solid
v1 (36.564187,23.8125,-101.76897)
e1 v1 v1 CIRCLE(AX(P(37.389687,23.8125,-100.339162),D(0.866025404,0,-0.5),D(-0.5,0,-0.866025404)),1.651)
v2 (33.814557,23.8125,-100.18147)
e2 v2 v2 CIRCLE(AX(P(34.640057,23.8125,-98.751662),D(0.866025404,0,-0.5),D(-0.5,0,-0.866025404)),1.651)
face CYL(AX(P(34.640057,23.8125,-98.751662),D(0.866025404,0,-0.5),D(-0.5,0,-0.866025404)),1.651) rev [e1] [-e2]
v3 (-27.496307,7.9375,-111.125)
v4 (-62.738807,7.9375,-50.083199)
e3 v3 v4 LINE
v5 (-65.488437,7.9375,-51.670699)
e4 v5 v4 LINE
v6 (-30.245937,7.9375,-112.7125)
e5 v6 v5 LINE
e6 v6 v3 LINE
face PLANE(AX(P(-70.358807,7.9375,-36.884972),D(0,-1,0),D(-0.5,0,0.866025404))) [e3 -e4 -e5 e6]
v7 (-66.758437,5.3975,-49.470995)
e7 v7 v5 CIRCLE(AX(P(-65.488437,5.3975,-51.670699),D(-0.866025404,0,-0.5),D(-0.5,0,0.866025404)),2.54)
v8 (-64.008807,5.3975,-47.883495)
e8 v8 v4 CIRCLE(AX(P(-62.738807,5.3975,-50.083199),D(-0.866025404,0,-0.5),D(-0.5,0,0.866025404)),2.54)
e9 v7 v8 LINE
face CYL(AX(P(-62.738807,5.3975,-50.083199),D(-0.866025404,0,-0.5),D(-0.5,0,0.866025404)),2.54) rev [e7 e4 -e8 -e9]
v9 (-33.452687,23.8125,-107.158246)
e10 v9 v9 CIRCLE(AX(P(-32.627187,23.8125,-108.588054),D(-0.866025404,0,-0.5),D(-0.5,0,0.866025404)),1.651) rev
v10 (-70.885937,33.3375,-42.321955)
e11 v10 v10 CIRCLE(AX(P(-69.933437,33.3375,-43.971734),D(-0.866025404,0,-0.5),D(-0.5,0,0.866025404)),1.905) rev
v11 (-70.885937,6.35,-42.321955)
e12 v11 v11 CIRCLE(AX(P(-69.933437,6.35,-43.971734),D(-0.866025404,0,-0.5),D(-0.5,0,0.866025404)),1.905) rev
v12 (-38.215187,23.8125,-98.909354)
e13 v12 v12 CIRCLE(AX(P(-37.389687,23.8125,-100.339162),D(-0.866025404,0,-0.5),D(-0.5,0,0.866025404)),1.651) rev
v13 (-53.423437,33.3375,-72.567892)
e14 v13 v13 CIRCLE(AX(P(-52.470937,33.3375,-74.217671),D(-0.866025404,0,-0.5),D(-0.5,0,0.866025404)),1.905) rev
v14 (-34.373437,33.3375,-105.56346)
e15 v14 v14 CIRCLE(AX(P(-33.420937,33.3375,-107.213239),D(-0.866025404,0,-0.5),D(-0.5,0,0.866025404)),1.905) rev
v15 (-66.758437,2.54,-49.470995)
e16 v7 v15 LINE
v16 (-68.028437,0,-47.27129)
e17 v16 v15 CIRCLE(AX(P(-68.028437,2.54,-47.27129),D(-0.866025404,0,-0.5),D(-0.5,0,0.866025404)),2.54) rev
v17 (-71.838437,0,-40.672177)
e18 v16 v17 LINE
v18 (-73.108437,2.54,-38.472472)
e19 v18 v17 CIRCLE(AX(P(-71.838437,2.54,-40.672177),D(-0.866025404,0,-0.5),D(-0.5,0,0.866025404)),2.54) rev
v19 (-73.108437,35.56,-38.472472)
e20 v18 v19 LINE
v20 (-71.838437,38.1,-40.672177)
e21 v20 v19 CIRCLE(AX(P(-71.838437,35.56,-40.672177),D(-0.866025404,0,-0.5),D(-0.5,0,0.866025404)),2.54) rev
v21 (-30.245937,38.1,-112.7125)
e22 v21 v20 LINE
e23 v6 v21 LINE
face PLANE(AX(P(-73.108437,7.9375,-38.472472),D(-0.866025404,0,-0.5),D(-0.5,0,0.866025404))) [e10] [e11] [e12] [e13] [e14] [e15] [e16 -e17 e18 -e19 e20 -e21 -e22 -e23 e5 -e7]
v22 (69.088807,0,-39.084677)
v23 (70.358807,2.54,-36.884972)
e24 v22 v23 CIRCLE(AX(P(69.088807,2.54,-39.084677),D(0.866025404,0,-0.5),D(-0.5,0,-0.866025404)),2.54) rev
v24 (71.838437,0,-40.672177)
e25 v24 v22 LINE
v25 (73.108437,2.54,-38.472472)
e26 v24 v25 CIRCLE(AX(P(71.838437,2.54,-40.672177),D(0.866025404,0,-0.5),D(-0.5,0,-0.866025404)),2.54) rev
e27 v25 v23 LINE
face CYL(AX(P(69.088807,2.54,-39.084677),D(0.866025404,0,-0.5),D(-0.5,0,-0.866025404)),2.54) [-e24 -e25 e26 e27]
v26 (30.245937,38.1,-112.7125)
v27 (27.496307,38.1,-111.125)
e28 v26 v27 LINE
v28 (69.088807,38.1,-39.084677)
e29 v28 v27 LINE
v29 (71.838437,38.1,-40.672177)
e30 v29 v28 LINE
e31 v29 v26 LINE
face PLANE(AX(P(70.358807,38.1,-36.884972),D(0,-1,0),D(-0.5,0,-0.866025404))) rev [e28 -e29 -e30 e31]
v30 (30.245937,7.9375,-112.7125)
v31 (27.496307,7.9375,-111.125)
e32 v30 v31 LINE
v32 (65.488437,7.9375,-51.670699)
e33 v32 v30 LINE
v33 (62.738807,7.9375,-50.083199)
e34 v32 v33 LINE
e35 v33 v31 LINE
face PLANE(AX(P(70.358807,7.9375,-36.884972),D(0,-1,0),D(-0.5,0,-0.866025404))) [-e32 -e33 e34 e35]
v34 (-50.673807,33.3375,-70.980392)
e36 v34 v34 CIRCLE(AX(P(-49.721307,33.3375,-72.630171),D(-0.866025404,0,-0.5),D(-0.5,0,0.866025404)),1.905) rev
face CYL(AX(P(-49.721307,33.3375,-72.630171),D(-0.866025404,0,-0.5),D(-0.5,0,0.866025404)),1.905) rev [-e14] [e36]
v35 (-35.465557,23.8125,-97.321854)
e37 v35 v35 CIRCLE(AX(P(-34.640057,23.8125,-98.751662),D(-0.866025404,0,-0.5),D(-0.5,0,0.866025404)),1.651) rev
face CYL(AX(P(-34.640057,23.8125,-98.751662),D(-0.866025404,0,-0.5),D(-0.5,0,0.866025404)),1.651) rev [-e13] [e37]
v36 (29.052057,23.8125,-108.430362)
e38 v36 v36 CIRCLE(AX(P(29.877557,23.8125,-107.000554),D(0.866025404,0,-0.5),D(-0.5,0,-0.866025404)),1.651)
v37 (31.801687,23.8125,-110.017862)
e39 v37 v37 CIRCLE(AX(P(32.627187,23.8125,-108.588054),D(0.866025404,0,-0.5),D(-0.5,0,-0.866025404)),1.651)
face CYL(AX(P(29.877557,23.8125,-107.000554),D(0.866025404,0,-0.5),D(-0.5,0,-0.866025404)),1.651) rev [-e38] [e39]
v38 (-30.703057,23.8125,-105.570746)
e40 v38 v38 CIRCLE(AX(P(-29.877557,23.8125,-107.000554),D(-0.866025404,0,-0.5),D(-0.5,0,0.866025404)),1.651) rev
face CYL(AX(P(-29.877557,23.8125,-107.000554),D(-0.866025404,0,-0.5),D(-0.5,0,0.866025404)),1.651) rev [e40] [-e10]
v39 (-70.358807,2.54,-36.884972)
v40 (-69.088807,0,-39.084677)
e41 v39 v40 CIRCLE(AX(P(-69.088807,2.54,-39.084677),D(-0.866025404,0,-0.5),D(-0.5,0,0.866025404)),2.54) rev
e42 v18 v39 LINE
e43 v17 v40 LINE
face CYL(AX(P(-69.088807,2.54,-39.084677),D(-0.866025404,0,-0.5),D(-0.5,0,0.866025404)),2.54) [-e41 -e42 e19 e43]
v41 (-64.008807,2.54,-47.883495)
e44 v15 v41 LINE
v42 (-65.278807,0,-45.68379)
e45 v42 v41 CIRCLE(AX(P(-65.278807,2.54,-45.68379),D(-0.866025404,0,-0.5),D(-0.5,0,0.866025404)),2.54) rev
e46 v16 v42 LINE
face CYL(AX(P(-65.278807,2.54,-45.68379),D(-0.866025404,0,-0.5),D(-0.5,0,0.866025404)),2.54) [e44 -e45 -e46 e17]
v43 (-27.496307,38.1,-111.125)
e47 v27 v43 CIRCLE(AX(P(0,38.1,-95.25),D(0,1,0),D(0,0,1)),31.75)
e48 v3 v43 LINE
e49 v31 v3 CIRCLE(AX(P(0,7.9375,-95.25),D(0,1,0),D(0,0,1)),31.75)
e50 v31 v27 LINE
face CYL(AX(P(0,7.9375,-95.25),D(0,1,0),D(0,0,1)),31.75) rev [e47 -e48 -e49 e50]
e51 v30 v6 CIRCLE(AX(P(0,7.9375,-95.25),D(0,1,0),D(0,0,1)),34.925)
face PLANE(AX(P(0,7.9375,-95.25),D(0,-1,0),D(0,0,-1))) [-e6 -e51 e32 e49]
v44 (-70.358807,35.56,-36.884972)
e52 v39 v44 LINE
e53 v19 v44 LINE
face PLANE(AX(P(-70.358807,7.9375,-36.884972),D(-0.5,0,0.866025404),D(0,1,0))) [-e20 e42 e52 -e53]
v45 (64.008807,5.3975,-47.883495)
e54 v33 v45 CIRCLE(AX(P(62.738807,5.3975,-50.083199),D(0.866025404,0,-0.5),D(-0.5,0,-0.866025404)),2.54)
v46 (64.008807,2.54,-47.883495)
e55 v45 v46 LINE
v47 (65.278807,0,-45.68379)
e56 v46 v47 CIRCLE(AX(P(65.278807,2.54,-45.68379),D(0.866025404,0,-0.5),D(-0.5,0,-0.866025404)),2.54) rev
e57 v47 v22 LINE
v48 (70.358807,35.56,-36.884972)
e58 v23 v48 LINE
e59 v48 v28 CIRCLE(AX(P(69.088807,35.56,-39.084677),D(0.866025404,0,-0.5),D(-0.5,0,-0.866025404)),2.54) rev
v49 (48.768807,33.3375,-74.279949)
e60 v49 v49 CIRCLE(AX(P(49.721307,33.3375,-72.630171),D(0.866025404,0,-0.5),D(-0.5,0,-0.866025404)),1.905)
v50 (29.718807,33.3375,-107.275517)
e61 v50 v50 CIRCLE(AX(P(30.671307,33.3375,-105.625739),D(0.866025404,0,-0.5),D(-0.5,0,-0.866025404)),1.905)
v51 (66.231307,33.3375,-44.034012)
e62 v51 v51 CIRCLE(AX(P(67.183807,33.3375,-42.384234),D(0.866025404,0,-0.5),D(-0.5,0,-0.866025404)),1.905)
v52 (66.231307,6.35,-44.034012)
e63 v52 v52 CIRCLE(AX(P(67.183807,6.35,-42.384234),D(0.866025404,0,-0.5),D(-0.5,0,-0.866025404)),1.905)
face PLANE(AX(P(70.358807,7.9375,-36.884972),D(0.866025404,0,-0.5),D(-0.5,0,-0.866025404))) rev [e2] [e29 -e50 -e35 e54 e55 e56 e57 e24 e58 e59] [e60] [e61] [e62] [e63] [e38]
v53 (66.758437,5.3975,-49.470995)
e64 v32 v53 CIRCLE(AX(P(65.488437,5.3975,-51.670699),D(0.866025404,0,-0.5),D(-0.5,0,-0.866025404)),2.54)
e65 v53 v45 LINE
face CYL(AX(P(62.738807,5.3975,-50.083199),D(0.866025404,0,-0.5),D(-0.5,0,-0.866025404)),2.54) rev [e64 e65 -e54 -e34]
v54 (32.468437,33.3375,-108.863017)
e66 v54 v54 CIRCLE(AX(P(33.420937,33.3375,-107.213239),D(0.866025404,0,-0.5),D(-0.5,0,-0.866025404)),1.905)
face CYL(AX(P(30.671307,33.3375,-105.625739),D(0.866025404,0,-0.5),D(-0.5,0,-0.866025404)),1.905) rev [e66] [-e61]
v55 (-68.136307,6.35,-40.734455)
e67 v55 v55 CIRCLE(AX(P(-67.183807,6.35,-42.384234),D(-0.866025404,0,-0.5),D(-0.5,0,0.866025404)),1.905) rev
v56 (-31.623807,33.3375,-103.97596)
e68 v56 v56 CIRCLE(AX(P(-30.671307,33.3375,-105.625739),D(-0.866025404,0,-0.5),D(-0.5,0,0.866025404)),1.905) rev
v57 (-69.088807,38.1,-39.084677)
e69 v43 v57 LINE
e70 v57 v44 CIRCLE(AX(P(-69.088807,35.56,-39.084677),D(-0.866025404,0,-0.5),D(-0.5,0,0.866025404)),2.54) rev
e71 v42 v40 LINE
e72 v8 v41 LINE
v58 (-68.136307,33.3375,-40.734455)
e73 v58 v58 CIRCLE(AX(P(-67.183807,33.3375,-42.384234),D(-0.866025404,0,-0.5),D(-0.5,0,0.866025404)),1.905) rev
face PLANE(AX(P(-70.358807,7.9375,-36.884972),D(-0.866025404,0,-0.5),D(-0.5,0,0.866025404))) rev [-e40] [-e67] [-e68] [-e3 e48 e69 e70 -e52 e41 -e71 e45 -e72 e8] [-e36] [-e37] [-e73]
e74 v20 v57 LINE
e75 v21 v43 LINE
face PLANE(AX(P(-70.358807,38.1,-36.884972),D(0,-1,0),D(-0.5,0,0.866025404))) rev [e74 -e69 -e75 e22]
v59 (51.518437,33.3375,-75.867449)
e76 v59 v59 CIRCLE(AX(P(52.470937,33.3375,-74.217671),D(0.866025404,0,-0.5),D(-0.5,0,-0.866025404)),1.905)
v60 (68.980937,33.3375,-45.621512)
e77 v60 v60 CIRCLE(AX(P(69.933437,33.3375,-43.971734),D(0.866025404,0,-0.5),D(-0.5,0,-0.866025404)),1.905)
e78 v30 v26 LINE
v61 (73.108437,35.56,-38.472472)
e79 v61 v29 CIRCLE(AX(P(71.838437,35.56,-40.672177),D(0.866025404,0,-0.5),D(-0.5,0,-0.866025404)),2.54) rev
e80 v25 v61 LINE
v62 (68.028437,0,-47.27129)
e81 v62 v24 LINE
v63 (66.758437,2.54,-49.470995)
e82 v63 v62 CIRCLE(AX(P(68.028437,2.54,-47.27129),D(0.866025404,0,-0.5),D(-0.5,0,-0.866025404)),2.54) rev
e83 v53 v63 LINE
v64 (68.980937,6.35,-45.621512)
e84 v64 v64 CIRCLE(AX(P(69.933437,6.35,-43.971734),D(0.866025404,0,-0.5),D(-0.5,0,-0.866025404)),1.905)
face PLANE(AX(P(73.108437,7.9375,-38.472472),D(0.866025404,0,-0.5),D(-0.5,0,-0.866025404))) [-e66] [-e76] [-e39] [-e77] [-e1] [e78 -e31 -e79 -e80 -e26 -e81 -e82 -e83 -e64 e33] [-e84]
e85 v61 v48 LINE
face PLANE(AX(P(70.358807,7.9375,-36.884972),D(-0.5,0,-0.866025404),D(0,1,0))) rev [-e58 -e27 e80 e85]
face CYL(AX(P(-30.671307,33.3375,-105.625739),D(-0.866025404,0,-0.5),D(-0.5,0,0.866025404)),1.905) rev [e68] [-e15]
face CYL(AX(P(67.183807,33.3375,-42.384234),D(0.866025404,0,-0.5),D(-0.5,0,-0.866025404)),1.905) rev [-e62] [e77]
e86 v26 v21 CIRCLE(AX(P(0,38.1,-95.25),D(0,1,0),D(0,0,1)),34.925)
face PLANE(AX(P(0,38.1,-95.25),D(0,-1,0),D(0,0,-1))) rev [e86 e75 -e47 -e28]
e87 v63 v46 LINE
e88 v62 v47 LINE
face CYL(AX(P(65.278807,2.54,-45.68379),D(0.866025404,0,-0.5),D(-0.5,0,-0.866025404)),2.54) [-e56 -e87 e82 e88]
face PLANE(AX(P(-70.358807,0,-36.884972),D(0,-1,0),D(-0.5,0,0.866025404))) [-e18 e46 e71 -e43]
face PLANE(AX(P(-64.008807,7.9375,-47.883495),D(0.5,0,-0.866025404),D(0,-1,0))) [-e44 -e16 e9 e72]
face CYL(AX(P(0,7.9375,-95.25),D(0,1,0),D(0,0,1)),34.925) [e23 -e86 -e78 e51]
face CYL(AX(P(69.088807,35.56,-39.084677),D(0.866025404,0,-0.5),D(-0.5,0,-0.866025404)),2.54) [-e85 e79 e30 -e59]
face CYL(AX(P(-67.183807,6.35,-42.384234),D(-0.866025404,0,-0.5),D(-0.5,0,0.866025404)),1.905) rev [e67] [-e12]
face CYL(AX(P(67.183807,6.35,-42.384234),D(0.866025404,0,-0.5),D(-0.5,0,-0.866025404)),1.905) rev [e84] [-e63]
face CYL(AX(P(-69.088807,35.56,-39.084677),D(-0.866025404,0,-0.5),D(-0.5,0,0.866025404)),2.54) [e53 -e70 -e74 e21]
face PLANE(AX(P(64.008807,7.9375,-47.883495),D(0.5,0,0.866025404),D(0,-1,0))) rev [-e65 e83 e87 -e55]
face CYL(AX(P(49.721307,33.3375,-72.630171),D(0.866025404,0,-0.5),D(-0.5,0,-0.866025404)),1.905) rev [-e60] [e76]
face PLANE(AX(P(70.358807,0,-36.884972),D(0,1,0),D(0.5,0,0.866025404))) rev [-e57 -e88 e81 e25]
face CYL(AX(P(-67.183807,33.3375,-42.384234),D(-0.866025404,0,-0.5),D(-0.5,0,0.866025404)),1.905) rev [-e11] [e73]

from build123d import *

# Parameters (mm, degrees)
BOSS_EXTRUDE10_DEPTH = 30.1625
SKETCH29_W           = 12.7
SKETCH29_H           = 7.9375
BOSS_EXTRUDE12_DEPTH = 6.35
CUT_EXTRUDE19_REACH  = 181.357
SKETCH30_R           = 1.651
CUT_EXTRUDE23_REACH  = 181.357
SKETCH38_R           = 1.905
FILLET24_R           = 2.54
CONVERT_SOLID1_DEPTH = 38.1


# Read off the part's stored shape, not the designer's step: Convert-Solid1
with BuildPart() as part:
    # Sketch28 → Boss-Extrude10 (new body)
    with BuildSketch(Plane(origin=(0, 38.1, 0), x_dir=(-1, 0, 0), z_dir=(0, -1, 0))):
        with BuildLine():
            Line((32.995567884, 114.3), (75.858067884, 40.059972261))
            Line((75.858067884, 40.059972261), (70.35880657, 36.884972261))
            Line((70.35880657, 36.884972261), (27.49630657, 111.125))
            ThreePointArc((27.49630657, 111.125), (0, 127), (-27.49630657, 111.125))
            Line((-27.49630657, 111.125), (-70.35880657, 36.884972261))
            Line((-70.35880657, 36.884972261), (-75.858067884, 40.059972261))
            Line((-75.858067884, 40.059972261), (-32.995567884, 114.3))
            ThreePointArc((-32.995567884, 114.3), (0, 133.35), (32.995567884, 114.3))
        make_face()
    extrude(amount=BOSS_EXTRUDE10_DEPTH)

    # Sketch29 → Boss-Extrude12 (add)
    with BuildSketch(Plane(origin=(-74.240027739, 0, -42.8625), x_dir=(-0.5, 0, 0.8660254037844387), z_dir=(-0.8660254037844387, 0, -0.5))):
        with Locations((-3.11391971, 3.96875)):
            Rectangle(SKETCH29_W, SKETCH29_H)
    boss_extrude12 = extrude(amount=-BOSS_EXTRUDE12_DEPTH)

    # Sketch30 → Cut-Extrude19 (cut, up to next)
    with BuildSketch(Plane(origin=(-74.240027739, 0, -42.8625), x_dir=(-0.5, 0, 0.8660254037844387), z_dir=(-0.8660254037844387, 0, -0.5)), mode=Mode.PRIVATE) as cut_extrude19_sk1:
        with Locations((-77.72641971, 23.8125)):
            Circle(SKETCH30_R)
    cut_extrude19_tool1 = extrude(cut_extrude19_sk1.sketch, amount=-CUT_EXTRUDE19_REACH, mode=Mode.PRIVATE) & part.part
    # Sketch30 → Cut-Extrude19 (cut, up to next)
    with BuildSketch(Plane(origin=(-74.240027739, 0, -42.8625), x_dir=(-0.5, 0, 0.8660254037844387), z_dir=(-0.8660254037844387, 0, -0.5)), mode=Mode.PRIVATE) as cut_extrude19_sk2:
        with Locations((-68.20141971, 23.8125)):
            Circle(SKETCH30_R)
    cut_extrude19_tool2 = extrude(cut_extrude19_sk2.sketch, amount=-CUT_EXTRUDE19_REACH, mode=Mode.PRIVATE) & part.part
    cut_extrude19_1 = cut_extrude19_tool1.solids().sort_by_distance((-35.376818, 23.8125, -110.175554))[0]
    add(cut_extrude19_1, mode=Mode.SUBTRACT)
    cut_extrude19_2 = cut_extrude19_tool2.solids().sort_by_distance((-40.139318, 23.8125, -101.926662))[0]
    add(cut_extrude19_2, mode=Mode.SUBTRACT)
    cut_extrude19 = cut_extrude19_1 + cut_extrude19_2  # Cut-Extrude19 as one shape, for the pattern or mirror that repeats it

    # Sketch38 → Cut-Extrude23 (cut, up to next)
    with BuildSketch(Plane(origin=(-74.240027739, 0, -42.8625), x_dir=(-0.5, 0, 0.8660254037844387), z_dir=(-0.8660254037844387, 0, -0.5)), mode=Mode.PRIVATE) as cut_extrude23_sk1:
        with Locations((-76.13891971, 33.3375)):
            Circle(SKETCH38_R)
    cut_extrude23_tool1 = extrude(cut_extrude23_sk1.sketch, amount=-CUT_EXTRUDE23_REACH, mode=Mode.PRIVATE) & part.part
    # Sketch38 → Cut-Extrude23 (cut, up to next)
    with BuildSketch(Plane(origin=(-74.240027739, 0, -42.8625), x_dir=(-0.5, 0, 0.8660254037844387), z_dir=(-0.8660254037844387, 0, -0.5)), mode=Mode.PRIVATE) as cut_extrude23_sk2:
        with Locations((-38.03891971, 33.3375)):
            Circle(SKETCH38_R)
    cut_extrude23_tool2 = extrude(cut_extrude23_sk2.sketch, amount=-CUT_EXTRUDE23_REACH, mode=Mode.PRIVATE) & part.part
    # Sketch38 → Cut-Extrude23 (cut, up to next)
    with BuildSketch(Plane(origin=(-74.240027739, 0, -42.8625), x_dir=(-0.5, 0, 0.8660254037844387), z_dir=(-0.8660254037844387, 0, -0.5)), mode=Mode.PRIVATE) as cut_extrude23_sk3:
        with Locations((-3.11391971, 33.3375)):
            Circle(SKETCH38_R)
    cut_extrude23_tool3 = extrude(cut_extrude23_sk3.sketch, amount=-CUT_EXTRUDE23_REACH, mode=Mode.PRIVATE) & part.part
    # Sketch38 → Cut-Extrude23 (cut, up to next)
    with BuildSketch(Plane(origin=(-74.240027739, 0, -42.8625), x_dir=(-0.5, 0, 0.8660254037844387), z_dir=(-0.8660254037844387, 0, -0.5)), mode=Mode.PRIVATE) as cut_extrude23_sk4:
        with Locations((-3.11391971, 6.35)):
            Circle(SKETCH38_R)
    cut_extrude23_tool4 = extrude(cut_extrude23_sk4.sketch, amount=-CUT_EXTRUDE23_REACH, mode=Mode.PRIVATE) & part.part
    cut_extrude23_1 = cut_extrude23_tool1.solids().sort_by_distance((-36.170568, 33.3375, -108.800739))[0]
    add(cut_extrude23_1, mode=Mode.SUBTRACT)
    cut_extrude23_2 = cut_extrude23_tool2.solids().sort_by_distance((-55.220568, 33.3375, -75.805171))[0]
    add(cut_extrude23_2, mode=Mode.SUBTRACT)
    cut_extrude23_3 = cut_extrude23_tool3.solids().sort_by_distance((-72.683068, 33.3375, -45.559234))[0]
    add(cut_extrude23_3, mode=Mode.SUBTRACT)
    cut_extrude23_4 = cut_extrude23_tool4.solids().sort_by_distance((-72.683068, 6.35, -45.559234))[0]
    add(cut_extrude23_4, mode=Mode.SUBTRACT)
    cut_extrude23 = cut_extrude23_1 + cut_extrude23_2 + cut_extrude23_3 + cut_extrude23_4  # Cut-Extrude23 as one shape, for the pattern or mirror that repeats it

    # Mirror7: Boss-Extrude12, Cut-Extrude19, Cut-Extrude23 across plane
    add(boss_extrude12.mirror(Plane(origin=(0, 0, 0), x_dir=(0, 0, 1), z_dir=(1, 0, 0))))
    add(cut_extrude19.mirror(Plane(origin=(0, 0, 0), x_dir=(0, 0, 1), z_dir=(1, 0, 0))), mode=Mode.SUBTRACT)
    add(cut_extrude23.mirror(Plane(origin=(0, 0, 0), x_dir=(0, 0, 1), z_dir=(1, 0, 0))), mode=Mode.SUBTRACT)

    # Fillet24
    fillet24_edges = [part.edges().sort_by_distance(p)[0] for p in [
        (73.108437227, 38.1, -38.472472261),
        (-73.108437227, 0, -38.472472261),
        (-66.758437227, 0, -49.470994889),
        (-66.758437227, 7.9375, -49.470994889),
        (73.108437227, 0, -38.472472261),
        (66.758437227, 7.9375, -49.470994889),
        (66.758437227, 0, -49.470994889),
        (-73.108437227, 38.1, -38.472472261),
    ]]
    fillet(fillet24_edges, radius=FILLET24_R)

    # Convert-Solid1 outline → Convert-Solid1 (cut)
    with BuildSketch(Plane(origin=(0, 0, 0), x_dir=(1, 0, 0), z_dir=(0, 1, 0))):
        with BuildLine():
            ThreePointArc((-30.245937227, 112.7125), (0, 130.175), (30.245937227, 112.7125))
            Line((30.245937227, 112.7125), (73.108437227, 38.472472261))
            Line((73.108437227, 38.472472261), (75.858067884, 40.059972261))
            Line((75.858067884, 40.059972261), (32.995567884, 114.3))
            ThreePointArc((32.995567884, 114.3), (0, 133.35), (-32.995567884, 114.3))
            Line((-32.995567884, 114.3), (-75.858067884, 40.059972261))
            Line((-75.858067884, 40.059972261), (-73.108437227, 38.472472261))
            Line((-73.108437227, 38.472472261), (-30.245937227, 112.7125))
        make_face()
    extrude(amount=CONVERT_SOLID1_DEPTH, mode=Mode.SUBTRACT)


solid = part.part
